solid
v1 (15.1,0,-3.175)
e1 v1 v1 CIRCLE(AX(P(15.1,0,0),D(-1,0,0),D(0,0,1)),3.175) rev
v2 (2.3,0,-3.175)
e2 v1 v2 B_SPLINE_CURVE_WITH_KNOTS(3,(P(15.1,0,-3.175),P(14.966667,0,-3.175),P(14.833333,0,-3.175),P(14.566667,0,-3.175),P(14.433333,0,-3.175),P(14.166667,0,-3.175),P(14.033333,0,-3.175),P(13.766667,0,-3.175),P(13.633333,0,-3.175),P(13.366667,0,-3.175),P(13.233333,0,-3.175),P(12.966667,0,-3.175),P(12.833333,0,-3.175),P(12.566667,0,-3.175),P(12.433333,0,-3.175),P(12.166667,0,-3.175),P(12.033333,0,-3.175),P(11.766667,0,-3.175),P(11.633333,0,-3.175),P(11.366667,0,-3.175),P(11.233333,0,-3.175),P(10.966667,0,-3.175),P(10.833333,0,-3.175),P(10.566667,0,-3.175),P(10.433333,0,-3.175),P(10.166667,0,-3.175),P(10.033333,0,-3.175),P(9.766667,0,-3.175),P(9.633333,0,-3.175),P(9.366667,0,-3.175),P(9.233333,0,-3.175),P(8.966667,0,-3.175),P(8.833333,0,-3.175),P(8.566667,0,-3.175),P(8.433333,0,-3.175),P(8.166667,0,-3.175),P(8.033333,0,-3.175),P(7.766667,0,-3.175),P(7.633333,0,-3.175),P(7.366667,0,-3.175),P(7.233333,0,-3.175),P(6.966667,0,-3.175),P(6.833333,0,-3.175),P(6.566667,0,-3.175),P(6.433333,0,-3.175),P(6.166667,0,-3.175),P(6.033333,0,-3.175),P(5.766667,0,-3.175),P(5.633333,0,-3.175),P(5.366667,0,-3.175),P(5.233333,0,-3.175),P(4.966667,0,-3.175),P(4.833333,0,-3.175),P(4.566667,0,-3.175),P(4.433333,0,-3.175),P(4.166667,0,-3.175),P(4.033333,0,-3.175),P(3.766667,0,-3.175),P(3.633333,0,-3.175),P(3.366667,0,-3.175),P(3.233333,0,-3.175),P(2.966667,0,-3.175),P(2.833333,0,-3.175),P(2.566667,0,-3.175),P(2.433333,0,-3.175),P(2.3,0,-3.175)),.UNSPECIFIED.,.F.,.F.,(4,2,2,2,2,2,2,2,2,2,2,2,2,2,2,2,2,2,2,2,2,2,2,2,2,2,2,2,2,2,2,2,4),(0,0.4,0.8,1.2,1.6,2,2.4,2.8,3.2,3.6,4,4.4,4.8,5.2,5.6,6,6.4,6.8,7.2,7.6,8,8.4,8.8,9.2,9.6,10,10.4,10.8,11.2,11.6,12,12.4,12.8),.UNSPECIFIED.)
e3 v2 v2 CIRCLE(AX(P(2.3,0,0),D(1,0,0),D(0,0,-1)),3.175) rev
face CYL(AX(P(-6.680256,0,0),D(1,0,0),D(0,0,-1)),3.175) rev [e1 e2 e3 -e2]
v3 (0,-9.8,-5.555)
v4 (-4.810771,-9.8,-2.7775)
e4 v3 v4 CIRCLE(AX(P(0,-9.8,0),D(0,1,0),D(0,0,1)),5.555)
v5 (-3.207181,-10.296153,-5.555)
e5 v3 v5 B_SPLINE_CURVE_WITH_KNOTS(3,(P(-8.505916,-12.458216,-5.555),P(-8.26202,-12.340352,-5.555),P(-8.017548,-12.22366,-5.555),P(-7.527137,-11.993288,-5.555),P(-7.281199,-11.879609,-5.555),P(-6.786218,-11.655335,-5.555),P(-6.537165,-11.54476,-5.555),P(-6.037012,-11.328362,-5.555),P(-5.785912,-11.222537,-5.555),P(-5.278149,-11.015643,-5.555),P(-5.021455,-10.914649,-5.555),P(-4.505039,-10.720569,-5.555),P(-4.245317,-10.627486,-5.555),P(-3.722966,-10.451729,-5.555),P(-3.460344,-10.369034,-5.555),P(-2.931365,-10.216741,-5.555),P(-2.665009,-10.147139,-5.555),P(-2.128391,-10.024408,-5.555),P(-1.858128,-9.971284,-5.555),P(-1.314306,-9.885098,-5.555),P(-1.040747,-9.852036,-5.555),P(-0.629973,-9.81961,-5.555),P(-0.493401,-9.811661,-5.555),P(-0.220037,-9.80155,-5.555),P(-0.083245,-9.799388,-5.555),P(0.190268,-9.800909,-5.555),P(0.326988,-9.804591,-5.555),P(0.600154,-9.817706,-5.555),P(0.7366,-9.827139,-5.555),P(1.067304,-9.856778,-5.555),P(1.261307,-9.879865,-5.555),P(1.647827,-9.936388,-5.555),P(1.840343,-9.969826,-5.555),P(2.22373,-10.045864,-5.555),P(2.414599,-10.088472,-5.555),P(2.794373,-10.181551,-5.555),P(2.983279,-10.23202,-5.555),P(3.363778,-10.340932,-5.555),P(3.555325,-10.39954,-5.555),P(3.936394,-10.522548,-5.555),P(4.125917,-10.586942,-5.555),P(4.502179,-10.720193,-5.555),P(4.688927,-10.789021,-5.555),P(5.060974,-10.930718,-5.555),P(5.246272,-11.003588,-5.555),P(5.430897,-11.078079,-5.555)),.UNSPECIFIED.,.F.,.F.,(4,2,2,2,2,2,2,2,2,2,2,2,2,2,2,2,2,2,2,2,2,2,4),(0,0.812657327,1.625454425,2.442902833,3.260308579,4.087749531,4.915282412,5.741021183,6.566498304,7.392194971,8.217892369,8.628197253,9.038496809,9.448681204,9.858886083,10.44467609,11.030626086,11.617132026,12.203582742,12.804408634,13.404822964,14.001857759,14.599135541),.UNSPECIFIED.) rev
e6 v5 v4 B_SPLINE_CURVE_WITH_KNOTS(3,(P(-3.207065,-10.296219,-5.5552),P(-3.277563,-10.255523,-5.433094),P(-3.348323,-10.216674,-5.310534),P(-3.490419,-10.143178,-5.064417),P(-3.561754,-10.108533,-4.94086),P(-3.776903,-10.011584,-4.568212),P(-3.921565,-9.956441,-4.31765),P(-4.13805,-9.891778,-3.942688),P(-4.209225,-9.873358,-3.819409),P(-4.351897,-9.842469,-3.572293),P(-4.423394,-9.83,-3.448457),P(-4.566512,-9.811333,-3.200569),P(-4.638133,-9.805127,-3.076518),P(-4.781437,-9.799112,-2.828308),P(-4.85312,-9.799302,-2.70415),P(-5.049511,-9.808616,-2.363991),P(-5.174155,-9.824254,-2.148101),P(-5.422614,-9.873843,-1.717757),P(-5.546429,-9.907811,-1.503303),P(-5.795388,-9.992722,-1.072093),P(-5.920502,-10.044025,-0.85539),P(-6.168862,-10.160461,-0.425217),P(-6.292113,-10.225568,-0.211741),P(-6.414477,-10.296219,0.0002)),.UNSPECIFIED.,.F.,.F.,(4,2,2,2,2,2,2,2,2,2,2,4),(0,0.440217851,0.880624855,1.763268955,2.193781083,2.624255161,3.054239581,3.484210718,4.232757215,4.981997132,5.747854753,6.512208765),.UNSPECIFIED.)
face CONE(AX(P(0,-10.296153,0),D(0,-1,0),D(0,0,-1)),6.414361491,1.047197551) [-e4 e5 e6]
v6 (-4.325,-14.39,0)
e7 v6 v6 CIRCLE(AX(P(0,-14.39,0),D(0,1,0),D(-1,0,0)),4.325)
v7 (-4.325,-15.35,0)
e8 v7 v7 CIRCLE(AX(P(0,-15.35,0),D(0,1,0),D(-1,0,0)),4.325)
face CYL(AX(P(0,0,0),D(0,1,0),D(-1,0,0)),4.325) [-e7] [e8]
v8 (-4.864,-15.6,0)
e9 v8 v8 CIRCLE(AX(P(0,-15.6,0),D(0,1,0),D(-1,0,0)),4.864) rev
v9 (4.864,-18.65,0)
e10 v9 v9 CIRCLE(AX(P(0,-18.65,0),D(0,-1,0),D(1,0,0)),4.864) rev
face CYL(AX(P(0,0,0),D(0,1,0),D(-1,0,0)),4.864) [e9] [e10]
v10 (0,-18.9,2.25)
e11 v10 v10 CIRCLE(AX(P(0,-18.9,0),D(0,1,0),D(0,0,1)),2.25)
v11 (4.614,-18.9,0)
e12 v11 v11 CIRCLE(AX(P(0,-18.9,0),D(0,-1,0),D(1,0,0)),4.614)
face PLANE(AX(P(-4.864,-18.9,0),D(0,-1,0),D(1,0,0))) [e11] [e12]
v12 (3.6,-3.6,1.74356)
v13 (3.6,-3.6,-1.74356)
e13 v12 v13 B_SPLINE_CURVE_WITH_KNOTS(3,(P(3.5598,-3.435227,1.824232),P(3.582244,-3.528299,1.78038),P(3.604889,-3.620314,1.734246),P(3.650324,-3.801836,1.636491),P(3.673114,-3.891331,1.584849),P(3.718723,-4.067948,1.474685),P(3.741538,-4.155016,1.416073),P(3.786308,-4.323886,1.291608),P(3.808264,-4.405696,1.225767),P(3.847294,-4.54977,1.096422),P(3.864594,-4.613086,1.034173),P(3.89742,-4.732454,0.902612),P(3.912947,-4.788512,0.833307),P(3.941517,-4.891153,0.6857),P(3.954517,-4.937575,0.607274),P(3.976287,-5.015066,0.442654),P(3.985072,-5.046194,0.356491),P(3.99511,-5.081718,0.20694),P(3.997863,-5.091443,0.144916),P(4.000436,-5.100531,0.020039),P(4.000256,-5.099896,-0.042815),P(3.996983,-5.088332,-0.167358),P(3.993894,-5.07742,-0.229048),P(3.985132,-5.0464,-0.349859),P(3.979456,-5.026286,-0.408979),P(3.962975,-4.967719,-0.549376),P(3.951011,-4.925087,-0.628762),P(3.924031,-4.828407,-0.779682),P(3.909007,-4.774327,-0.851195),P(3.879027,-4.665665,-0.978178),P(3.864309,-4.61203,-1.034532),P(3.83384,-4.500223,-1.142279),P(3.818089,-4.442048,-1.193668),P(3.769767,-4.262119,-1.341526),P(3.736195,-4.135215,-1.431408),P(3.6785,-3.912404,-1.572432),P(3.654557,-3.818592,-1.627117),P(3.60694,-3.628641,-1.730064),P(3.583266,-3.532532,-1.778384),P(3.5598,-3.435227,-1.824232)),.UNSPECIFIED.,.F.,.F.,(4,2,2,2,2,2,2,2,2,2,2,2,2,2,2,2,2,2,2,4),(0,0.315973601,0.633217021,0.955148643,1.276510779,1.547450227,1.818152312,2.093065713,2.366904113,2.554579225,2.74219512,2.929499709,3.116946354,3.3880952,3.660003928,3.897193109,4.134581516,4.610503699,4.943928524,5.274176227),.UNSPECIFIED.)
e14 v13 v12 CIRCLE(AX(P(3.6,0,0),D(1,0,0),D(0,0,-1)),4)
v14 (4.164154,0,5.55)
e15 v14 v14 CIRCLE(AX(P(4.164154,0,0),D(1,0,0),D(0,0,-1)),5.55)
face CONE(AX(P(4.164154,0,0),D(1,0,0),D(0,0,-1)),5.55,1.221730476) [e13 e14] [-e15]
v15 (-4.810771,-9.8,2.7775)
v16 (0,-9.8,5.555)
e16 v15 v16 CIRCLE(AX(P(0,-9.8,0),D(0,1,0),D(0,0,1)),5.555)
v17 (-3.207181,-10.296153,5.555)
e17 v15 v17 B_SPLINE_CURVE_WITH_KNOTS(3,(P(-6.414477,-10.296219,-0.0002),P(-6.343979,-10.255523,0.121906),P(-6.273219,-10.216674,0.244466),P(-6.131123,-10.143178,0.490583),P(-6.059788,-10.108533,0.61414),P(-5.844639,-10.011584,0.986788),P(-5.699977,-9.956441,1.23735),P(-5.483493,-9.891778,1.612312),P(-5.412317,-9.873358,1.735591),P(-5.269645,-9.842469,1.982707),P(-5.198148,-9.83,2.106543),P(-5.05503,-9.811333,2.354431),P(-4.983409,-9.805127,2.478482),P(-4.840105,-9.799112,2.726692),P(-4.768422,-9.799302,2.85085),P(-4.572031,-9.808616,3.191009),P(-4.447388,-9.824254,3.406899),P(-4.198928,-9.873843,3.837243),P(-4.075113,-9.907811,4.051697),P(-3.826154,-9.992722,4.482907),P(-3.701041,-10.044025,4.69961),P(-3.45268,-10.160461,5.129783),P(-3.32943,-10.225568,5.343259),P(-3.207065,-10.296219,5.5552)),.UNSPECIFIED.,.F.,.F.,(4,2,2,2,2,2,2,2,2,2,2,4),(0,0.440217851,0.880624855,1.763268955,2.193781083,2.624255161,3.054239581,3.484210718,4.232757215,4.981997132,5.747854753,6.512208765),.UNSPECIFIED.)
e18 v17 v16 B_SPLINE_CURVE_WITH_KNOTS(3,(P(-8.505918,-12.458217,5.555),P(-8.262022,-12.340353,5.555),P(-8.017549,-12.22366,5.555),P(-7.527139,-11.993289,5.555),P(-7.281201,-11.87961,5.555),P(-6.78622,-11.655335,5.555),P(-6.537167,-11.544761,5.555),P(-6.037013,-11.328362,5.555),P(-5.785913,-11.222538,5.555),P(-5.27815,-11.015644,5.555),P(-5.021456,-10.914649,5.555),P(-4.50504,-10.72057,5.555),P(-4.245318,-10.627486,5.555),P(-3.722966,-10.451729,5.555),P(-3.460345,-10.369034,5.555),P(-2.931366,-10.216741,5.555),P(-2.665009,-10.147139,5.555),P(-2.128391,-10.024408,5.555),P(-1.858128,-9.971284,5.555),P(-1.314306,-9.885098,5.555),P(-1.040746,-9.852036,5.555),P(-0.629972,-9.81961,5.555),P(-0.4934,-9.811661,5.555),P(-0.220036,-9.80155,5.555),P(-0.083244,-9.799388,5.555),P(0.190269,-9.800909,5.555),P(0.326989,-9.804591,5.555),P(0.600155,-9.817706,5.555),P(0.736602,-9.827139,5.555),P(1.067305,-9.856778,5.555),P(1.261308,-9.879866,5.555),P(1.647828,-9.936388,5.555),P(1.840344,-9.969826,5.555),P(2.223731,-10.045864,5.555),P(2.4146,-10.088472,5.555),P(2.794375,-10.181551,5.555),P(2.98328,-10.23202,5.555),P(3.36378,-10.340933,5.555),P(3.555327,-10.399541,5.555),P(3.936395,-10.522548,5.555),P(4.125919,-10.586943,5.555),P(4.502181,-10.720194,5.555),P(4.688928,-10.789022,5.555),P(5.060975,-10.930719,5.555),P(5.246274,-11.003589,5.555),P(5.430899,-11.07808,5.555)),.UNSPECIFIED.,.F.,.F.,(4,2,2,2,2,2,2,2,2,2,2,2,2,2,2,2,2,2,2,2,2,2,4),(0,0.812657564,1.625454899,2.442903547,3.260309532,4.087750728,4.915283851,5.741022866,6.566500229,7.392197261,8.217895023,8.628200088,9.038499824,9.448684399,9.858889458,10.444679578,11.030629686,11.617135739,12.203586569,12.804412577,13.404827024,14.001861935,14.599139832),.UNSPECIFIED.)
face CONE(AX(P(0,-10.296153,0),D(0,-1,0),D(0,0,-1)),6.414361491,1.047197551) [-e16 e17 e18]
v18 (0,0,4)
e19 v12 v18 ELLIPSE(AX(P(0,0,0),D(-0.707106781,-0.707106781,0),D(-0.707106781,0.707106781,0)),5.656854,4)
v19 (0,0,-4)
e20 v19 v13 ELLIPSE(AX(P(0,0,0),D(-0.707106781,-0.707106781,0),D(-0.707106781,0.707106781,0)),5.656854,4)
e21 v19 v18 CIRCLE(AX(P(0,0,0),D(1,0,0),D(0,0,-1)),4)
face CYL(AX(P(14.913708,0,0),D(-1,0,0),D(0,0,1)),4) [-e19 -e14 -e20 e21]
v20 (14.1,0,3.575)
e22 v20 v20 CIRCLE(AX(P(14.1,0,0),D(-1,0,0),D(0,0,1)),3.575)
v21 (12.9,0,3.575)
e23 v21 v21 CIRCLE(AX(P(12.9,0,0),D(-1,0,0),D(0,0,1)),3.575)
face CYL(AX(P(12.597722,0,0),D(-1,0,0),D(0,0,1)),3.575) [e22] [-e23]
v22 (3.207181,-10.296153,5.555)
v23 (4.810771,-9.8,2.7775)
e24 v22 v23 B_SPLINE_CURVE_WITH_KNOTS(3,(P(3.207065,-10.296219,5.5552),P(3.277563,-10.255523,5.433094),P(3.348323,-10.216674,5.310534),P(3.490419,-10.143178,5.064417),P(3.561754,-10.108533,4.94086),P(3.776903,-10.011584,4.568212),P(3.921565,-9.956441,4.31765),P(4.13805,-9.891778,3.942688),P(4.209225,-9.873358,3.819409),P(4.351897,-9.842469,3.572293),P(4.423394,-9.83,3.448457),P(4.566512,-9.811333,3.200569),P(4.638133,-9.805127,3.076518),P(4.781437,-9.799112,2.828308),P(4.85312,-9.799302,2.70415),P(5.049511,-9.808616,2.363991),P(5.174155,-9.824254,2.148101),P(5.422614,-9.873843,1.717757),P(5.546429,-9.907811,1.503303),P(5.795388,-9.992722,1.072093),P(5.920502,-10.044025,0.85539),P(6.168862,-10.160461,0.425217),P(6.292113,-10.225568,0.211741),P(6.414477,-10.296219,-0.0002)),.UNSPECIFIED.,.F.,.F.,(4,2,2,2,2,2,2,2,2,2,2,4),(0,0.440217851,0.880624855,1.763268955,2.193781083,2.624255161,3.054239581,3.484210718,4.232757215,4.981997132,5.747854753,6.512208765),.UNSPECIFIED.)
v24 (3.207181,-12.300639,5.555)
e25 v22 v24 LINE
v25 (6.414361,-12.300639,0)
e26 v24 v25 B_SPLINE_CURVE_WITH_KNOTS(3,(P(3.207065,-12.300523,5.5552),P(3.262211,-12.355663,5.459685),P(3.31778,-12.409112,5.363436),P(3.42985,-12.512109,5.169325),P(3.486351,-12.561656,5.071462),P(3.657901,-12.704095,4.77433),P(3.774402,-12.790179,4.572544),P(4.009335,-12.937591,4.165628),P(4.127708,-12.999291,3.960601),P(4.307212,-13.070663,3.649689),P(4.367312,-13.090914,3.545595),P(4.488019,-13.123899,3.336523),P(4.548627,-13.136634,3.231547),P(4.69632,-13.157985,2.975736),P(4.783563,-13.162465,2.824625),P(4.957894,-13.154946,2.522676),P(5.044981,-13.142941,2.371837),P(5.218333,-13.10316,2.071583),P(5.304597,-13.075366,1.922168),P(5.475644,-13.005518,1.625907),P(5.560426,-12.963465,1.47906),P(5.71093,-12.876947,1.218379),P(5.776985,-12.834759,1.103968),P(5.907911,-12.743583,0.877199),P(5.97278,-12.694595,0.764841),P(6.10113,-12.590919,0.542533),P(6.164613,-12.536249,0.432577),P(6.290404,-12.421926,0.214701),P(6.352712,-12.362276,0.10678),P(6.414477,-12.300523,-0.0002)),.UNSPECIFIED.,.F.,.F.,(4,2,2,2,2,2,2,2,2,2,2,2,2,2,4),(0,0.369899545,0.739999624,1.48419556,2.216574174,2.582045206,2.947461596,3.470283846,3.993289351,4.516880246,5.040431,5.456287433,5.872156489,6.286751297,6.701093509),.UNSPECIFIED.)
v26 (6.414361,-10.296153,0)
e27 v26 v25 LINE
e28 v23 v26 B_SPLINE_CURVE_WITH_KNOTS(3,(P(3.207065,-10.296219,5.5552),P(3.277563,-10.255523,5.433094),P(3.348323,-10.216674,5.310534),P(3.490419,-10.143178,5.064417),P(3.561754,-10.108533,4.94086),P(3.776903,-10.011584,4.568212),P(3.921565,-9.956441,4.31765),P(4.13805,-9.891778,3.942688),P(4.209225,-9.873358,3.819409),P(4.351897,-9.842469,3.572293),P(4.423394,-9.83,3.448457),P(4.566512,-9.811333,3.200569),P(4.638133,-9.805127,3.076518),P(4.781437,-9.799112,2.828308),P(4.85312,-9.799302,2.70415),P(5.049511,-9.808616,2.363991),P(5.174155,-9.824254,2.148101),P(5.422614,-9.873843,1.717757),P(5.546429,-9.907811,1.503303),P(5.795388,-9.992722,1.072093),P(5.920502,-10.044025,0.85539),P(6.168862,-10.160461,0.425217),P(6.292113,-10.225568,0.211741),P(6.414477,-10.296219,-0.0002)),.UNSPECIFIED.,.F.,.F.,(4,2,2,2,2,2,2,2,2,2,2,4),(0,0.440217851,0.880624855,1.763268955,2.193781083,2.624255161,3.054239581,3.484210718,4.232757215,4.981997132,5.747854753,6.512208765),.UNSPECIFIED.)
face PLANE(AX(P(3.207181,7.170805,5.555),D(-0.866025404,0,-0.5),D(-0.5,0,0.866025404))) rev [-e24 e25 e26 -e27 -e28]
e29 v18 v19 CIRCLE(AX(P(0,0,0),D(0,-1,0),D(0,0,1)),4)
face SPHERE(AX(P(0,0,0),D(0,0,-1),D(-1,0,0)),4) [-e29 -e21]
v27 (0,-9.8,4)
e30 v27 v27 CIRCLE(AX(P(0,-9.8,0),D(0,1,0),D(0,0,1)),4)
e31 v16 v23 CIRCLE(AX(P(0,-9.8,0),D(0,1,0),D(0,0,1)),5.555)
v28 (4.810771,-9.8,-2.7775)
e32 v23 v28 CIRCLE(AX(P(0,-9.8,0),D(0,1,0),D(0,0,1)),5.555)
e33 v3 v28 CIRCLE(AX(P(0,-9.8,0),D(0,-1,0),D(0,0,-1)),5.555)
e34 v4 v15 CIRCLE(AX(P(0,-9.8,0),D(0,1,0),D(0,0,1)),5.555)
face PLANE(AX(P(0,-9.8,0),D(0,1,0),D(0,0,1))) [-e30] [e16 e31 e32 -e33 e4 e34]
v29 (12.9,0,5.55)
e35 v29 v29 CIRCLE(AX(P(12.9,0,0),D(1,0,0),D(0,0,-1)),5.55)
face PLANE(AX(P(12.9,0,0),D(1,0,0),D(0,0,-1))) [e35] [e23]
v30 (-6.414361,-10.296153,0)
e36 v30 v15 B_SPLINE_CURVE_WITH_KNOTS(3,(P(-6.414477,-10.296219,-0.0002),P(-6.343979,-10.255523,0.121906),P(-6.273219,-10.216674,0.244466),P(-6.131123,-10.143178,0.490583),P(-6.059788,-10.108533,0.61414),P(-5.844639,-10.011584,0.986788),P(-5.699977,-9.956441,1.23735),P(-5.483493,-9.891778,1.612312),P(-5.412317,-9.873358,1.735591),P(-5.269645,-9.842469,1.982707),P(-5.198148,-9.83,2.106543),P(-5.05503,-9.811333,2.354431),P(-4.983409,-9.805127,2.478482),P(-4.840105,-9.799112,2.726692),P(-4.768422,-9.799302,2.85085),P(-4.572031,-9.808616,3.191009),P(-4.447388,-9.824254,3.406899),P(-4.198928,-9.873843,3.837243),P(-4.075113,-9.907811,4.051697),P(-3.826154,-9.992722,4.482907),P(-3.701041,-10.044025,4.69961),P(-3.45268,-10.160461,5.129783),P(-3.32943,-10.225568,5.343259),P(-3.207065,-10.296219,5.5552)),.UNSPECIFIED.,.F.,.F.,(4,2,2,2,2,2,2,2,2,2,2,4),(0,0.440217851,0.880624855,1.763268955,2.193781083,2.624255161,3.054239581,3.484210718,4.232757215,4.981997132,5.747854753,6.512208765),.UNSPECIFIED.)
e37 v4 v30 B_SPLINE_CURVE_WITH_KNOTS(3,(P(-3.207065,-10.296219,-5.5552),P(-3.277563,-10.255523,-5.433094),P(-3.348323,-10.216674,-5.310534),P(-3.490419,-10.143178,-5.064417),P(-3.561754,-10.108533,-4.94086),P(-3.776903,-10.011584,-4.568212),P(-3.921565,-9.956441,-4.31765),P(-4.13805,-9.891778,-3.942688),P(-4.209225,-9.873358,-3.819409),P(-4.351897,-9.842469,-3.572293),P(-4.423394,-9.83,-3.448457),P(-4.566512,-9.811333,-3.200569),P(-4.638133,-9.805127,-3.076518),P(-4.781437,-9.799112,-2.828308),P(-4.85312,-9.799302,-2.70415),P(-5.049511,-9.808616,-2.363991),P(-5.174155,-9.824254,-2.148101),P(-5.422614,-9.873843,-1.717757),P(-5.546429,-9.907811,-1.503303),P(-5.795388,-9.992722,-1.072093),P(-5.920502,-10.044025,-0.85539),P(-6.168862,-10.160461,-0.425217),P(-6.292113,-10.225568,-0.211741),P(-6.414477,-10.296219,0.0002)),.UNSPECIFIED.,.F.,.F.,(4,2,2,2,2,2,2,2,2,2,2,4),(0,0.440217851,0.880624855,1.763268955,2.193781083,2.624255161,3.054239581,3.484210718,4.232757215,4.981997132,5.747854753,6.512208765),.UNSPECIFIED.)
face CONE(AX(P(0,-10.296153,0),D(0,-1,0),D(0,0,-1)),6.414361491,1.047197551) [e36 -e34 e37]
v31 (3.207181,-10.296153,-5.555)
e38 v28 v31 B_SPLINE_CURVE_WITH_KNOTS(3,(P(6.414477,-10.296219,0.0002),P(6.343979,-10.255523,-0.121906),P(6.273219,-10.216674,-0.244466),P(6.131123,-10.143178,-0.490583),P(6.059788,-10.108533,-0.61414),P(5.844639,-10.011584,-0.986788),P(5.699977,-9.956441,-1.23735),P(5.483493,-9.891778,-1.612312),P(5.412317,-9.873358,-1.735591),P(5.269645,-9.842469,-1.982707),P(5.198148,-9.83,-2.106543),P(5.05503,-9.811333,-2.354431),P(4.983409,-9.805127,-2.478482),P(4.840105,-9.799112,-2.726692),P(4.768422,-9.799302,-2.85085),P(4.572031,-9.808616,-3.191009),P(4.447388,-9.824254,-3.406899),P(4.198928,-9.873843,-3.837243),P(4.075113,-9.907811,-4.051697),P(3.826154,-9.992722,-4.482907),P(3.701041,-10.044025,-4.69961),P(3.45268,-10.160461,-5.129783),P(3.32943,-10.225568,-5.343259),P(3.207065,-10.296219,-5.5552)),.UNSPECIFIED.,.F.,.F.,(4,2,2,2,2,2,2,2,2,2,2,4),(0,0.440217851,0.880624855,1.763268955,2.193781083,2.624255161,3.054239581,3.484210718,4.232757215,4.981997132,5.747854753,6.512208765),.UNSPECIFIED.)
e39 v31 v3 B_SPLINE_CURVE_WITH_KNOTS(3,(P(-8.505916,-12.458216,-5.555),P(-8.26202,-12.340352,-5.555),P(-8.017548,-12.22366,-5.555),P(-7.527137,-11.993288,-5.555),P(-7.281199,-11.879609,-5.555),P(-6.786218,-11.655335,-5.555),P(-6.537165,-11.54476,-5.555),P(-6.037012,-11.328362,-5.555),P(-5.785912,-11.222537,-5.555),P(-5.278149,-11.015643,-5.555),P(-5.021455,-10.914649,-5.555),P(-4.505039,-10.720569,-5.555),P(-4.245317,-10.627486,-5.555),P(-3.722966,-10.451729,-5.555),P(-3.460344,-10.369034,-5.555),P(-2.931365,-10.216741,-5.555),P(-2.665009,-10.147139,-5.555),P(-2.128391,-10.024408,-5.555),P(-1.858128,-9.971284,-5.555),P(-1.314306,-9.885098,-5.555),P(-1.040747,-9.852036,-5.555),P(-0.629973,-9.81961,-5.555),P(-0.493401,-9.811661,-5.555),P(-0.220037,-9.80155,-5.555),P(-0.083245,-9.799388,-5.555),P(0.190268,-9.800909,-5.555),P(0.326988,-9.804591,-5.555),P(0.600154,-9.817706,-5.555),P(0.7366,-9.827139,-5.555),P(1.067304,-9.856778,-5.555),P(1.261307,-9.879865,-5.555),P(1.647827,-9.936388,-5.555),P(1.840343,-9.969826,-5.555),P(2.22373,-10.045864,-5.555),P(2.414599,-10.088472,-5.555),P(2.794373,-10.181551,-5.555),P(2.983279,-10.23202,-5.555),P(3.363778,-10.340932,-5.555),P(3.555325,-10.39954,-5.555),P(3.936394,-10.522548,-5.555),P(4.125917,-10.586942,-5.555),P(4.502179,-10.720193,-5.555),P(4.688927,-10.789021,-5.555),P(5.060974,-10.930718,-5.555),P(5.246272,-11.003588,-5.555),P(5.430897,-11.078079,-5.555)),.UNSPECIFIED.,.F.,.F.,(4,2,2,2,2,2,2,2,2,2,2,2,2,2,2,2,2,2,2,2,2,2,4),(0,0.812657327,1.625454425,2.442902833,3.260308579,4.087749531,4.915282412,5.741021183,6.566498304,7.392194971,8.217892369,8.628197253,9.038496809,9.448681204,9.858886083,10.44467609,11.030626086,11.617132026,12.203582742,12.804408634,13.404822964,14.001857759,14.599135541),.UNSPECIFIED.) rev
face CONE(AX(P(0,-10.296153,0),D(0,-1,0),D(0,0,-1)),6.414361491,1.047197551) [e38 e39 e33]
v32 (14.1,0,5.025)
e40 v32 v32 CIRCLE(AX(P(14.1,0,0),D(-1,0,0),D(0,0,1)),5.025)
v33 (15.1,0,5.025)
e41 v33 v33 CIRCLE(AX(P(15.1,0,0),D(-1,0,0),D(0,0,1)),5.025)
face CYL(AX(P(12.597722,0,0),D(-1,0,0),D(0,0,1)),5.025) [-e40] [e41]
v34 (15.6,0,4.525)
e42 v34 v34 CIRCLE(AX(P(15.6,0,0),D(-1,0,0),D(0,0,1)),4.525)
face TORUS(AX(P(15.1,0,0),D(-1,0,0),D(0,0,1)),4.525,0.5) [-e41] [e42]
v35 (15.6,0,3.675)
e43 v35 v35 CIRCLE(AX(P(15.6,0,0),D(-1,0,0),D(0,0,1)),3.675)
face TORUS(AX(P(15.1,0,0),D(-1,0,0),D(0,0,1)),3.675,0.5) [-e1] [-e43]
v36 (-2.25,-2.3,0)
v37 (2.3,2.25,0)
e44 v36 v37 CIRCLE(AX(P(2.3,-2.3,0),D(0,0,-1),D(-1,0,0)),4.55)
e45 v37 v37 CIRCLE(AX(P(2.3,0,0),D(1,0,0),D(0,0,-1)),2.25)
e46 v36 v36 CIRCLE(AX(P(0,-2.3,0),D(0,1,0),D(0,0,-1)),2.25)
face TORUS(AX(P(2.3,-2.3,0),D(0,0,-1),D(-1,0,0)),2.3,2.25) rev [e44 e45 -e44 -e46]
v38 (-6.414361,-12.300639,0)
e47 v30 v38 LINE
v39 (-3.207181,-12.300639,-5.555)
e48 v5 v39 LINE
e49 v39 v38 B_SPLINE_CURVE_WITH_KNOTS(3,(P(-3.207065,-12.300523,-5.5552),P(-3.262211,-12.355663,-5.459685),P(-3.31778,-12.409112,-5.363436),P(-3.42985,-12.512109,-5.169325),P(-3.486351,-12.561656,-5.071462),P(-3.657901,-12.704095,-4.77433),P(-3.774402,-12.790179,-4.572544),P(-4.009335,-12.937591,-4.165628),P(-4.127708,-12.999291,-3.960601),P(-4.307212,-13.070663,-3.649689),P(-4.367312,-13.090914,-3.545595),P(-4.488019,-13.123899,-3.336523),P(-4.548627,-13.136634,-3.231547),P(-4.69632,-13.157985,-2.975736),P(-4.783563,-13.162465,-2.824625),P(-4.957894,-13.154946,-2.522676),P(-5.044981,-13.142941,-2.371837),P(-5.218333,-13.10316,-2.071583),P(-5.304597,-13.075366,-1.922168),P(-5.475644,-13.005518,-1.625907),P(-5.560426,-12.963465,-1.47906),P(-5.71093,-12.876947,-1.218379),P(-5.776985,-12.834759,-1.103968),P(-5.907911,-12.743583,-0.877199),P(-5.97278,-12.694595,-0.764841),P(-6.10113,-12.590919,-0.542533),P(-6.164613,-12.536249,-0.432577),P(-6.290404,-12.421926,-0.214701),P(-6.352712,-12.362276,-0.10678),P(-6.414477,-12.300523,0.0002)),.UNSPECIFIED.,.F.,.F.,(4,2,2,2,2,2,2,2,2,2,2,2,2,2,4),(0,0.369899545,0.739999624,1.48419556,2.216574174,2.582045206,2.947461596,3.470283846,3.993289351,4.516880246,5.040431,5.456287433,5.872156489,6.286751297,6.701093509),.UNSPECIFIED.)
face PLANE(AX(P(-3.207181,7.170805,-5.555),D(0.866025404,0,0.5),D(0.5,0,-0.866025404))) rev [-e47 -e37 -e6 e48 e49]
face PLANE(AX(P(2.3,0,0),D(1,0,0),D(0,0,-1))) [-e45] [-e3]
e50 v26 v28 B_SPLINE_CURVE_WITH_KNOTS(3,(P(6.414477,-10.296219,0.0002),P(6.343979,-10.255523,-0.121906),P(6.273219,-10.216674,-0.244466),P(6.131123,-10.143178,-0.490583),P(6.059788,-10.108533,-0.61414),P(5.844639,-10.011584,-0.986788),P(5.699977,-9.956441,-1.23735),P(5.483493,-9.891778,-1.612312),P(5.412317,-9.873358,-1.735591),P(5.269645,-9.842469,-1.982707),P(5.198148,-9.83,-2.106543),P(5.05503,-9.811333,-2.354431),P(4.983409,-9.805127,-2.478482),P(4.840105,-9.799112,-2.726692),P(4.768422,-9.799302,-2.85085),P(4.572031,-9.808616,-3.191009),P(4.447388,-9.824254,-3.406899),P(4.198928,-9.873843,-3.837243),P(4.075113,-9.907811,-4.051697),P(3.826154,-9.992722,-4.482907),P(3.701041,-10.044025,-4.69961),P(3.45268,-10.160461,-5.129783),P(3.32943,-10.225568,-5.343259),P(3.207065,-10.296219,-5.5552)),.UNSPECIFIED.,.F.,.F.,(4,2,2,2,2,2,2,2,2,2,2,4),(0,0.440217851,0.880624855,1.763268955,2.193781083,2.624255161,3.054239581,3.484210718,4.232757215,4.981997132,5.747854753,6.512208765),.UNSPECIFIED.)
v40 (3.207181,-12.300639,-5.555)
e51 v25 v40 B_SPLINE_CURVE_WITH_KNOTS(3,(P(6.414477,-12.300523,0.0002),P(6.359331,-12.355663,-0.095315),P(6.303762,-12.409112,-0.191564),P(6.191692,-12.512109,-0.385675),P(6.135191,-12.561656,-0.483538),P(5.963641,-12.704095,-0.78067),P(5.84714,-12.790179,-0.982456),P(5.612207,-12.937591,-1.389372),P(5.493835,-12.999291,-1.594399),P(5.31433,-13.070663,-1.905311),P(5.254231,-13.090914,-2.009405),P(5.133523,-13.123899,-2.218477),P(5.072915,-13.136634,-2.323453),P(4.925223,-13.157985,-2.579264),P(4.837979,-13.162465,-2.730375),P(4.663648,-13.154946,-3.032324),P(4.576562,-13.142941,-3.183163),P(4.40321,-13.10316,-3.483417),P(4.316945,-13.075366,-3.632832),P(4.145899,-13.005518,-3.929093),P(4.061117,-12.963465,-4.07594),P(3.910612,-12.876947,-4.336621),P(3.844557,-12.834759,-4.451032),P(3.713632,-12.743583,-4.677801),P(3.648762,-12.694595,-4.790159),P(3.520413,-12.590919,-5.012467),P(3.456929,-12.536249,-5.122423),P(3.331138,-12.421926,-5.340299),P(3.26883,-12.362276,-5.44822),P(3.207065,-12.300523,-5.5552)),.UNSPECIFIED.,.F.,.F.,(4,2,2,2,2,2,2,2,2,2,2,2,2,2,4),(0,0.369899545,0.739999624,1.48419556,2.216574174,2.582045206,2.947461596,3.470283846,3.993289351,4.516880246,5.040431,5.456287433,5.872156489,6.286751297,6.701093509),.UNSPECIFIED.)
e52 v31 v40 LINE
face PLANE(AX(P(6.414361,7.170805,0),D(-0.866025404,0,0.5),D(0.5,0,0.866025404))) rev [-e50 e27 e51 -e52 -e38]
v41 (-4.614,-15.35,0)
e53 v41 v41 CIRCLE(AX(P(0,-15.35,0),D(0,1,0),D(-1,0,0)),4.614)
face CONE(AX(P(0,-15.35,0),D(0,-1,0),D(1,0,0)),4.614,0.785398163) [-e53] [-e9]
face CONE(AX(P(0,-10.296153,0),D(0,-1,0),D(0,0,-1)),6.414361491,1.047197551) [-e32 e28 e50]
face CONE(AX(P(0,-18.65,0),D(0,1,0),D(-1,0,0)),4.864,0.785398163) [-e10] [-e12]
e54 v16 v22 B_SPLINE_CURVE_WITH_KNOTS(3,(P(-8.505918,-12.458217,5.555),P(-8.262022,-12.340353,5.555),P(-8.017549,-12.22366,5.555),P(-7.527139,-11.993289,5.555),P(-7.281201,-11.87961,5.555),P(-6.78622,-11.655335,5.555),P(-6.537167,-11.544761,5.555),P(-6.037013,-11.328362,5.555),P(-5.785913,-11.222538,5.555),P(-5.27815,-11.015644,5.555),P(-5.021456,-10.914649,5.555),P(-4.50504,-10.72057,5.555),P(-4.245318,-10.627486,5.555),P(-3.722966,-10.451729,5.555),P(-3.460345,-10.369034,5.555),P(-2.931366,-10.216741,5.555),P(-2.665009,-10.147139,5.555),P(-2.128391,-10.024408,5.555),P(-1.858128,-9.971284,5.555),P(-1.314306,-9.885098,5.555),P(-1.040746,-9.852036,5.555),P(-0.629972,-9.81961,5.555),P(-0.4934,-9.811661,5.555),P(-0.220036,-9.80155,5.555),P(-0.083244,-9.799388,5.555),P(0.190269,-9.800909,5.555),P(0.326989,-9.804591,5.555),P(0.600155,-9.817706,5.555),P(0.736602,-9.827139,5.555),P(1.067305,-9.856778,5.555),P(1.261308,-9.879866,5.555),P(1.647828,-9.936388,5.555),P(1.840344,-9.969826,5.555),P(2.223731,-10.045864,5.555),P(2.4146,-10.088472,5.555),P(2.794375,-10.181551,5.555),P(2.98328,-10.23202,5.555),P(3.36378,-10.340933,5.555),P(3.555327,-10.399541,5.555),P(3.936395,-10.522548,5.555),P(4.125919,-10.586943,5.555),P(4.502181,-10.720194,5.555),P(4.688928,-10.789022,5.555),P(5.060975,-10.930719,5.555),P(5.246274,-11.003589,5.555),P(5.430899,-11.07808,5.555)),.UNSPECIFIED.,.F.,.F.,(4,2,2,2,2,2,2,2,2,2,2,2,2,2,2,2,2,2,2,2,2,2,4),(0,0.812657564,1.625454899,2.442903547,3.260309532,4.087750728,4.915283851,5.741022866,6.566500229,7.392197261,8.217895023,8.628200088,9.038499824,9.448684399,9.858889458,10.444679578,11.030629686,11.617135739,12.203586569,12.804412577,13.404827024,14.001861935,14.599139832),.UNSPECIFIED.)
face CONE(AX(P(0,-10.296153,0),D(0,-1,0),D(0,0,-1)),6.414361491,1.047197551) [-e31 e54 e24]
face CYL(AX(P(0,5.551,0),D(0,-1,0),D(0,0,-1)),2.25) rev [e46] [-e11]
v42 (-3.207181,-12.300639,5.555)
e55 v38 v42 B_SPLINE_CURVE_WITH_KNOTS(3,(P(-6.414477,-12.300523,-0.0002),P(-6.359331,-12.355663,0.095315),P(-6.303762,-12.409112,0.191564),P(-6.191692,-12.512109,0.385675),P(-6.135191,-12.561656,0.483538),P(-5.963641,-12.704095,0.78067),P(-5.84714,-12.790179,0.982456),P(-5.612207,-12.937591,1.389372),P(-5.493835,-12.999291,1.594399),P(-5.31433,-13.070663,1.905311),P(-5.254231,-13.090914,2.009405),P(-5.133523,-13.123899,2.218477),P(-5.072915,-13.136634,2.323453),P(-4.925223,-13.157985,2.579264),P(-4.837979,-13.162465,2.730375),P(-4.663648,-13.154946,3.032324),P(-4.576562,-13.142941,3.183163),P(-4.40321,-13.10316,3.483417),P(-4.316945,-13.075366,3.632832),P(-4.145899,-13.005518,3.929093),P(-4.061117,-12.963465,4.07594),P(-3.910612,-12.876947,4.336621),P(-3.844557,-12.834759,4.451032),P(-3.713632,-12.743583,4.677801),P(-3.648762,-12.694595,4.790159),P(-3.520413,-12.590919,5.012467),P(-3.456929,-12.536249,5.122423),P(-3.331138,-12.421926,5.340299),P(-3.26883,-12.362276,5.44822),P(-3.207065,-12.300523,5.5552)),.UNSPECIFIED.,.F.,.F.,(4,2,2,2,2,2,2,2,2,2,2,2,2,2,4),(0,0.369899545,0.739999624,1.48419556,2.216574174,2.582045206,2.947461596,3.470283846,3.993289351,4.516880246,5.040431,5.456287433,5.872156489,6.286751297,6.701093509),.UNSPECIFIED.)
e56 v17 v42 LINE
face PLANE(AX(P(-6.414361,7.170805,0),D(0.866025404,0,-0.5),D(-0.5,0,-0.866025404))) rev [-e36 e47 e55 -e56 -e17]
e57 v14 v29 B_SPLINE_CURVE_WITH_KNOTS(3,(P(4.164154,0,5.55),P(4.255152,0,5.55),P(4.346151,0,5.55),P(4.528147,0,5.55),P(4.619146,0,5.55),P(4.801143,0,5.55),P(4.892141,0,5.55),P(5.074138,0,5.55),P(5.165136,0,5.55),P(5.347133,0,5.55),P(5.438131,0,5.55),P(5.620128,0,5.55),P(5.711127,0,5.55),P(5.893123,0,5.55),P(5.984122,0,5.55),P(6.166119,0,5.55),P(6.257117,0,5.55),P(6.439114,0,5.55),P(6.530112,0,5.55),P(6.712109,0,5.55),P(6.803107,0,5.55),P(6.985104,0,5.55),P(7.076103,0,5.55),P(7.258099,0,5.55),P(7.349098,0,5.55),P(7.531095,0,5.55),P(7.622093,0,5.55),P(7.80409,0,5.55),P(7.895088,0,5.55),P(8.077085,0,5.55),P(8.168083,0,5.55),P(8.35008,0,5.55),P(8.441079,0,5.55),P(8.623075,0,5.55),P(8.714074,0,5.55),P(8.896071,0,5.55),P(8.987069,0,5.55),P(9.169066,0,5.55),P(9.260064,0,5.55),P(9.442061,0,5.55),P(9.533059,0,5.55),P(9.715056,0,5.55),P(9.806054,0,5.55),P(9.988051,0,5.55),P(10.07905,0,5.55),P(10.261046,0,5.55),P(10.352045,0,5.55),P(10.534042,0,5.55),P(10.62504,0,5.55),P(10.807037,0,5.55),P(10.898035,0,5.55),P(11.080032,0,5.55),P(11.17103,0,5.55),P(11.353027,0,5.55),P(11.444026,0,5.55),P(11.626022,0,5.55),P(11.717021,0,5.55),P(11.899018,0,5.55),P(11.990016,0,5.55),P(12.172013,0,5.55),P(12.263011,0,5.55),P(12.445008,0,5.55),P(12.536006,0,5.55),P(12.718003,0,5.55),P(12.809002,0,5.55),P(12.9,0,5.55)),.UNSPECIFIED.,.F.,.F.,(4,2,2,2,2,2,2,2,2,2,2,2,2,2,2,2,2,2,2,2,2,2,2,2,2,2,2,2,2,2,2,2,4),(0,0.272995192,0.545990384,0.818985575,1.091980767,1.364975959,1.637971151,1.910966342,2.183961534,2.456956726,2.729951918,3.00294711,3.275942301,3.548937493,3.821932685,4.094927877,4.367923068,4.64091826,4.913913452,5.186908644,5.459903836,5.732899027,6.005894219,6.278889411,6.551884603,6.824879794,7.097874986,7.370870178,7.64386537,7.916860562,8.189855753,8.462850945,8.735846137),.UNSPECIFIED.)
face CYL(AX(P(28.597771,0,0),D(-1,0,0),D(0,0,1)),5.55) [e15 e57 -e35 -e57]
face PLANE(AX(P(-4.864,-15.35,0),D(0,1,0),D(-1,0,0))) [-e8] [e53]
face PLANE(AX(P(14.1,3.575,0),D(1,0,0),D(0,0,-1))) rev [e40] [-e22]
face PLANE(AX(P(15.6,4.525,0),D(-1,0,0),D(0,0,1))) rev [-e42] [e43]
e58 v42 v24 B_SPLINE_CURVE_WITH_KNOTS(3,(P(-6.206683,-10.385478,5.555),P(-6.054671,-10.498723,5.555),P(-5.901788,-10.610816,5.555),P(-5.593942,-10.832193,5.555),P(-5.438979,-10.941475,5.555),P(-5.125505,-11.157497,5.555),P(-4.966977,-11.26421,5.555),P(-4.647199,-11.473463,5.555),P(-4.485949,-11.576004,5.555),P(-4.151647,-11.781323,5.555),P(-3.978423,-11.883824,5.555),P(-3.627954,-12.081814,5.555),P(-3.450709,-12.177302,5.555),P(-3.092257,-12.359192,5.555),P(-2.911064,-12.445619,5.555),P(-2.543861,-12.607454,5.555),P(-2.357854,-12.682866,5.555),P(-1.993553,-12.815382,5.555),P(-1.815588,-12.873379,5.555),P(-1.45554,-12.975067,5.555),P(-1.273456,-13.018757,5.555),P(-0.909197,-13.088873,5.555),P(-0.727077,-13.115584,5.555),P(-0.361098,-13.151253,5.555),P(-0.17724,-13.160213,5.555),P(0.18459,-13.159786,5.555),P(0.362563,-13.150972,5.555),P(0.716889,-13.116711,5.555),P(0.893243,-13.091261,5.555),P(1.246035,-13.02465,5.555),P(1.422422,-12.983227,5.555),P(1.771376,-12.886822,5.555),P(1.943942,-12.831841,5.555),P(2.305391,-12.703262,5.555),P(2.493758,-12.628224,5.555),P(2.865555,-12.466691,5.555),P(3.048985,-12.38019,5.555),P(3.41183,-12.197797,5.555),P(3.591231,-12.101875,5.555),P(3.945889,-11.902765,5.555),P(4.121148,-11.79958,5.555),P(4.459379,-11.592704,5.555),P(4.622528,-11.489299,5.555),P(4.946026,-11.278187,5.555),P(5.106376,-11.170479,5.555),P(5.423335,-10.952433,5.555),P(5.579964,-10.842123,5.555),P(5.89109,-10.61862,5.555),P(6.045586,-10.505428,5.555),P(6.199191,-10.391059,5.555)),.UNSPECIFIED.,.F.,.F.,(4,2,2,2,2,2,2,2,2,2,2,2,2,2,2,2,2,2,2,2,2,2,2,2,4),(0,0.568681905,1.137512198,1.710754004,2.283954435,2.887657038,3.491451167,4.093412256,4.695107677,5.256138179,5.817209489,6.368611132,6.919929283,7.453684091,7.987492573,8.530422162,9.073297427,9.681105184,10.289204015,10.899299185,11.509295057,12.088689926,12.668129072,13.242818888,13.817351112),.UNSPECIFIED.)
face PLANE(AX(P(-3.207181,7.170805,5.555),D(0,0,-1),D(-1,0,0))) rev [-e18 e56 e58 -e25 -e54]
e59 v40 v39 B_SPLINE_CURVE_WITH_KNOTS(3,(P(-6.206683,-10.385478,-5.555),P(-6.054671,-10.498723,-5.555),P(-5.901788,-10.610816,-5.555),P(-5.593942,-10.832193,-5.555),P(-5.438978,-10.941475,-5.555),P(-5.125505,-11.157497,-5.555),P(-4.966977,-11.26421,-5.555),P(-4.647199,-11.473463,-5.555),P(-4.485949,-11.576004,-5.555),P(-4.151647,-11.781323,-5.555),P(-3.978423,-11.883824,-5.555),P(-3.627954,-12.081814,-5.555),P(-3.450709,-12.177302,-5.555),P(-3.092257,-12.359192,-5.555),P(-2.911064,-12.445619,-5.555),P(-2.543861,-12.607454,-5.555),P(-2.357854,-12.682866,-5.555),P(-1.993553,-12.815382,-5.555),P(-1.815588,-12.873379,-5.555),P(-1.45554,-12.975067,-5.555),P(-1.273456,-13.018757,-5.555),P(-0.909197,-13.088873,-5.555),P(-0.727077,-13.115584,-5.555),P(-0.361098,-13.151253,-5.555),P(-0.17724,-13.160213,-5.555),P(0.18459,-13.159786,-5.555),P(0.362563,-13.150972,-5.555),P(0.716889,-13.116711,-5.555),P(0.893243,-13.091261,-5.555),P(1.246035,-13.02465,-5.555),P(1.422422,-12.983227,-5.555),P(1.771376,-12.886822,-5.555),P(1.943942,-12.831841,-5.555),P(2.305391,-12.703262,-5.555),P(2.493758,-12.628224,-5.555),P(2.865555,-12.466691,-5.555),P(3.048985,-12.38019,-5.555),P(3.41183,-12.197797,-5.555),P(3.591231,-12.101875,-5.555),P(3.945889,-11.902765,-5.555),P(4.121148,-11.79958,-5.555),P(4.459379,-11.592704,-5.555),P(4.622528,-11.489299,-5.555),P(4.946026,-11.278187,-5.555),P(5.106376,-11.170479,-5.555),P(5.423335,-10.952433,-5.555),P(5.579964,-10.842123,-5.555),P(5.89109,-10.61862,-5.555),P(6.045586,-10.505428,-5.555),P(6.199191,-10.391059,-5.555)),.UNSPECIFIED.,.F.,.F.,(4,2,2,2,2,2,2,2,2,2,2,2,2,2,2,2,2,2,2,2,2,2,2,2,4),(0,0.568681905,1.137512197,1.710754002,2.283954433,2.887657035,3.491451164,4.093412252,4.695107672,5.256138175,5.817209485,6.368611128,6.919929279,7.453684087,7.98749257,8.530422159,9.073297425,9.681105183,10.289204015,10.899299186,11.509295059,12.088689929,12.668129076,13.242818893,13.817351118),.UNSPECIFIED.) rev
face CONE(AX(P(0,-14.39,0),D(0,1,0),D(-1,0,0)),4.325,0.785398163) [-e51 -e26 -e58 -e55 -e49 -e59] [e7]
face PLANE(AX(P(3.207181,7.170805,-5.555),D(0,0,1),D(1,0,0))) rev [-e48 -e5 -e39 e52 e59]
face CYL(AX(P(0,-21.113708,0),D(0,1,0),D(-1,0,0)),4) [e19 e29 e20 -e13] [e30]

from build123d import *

# Parameters (mm, degrees)
SKETCH1_R             = 4
BASE_EXTRUDE_DEPTH    = 3.6
RBODY_SKETCH_R        = 5.55
RBODY_DEPTH           = 9.3
ELBOW_ANGLE           = 90
SKETCH3_R             = 4
BOSS_EXTRUDE1_DEPTH   = 9.8
NUT_DEPTH             = 4.59
THREAD_CHAMFER_SIZE   = 0.25
RTUBE_START           = -13.3
RTUBE_SKETCH_R        = 3.175
RTUBE_DEPTH           = 13.3
RTUBE_RADIUS_R        = 0.5
DIAMETER_R            = 2.25
PORT_THREADS_REACH    = 31.53
PORT_THREADS_SKETCH_R = 2.25


with BuildPart() as part:
    # Sketch1 → Base-Extrude (new body)
    with BuildSketch(Plane(origin=(0, 0, 0), x_dir=(0, 0, -1), z_dir=(1, 0, 0))):
        with Locations(Location((0, 0, 0), (0, 0, 180))):
            Circle(SKETCH1_R)
    extrude(amount=BASE_EXTRUDE_DEPTH)

    # RBody_Sketch → RBody (add)
    with BuildSketch(Plane(origin=(3.6, 0, 0), x_dir=(0, 0, -1), z_dir=(1, 0, 0))):
        with Locations(Location((0, 0, 0), (0, 0, 180))):
            Circle(RBODY_SKETCH_R)
    extrude(amount=RBODY_DEPTH)

    # RBody_Chamfer: read off the stored shape, not the designer's step
    # RBody_Chamfer outline → RBody_Chamfer (revolve, cut)
    with BuildSketch(Plane.YX):
        Polygon((5.55, 4.164153863), (4, 3.6), (5.55, 3.6), align=None)
    revolve(axis=Axis((0, 0, 0), (1, 0, 0)), mode=Mode.SUBTRACT)

    # RRelease_Sketch → RRelease (revolve)
    with BuildSketch(Plane.XY, mode=Mode.PRIVATE) as rrelease_sk:
        with BuildLine():
            Line((12.9, 3.575), (14.1, 3.575))
            Line((14.1, 3.575), (14.1, 5.025))
            Line((14.1, 5.025), (15.1, 5.025))
            ThreePointArc((15.1, 5.025), (15.453553391, 4.878553391), (15.6, 4.525))
            Line((15.6, 4.525), (15.6, 0))
            Line((15.6, 0), (12.9, 0))
            Line((12.9, 0), (12.9, 3.575))
        make_face()
    revolve(rrelease_sk.sketch.rotate(Axis((12.597722381, 0, 0), (1, 0, 0)), 90), axis=Axis((12.597722381, 0, 0), (1, 0, 0)))

    # Elbow_Sketch → Elbow (revolve)
    with BuildSketch(Plane.ZY):
        with BuildLine():
            Line((-4, 0), (4, 0))
            ThreePointArc((4, 0), (0, 4), (-4, 0))
        make_face()
    revolve(axis=Axis((0, 0, -6.487672297), (0, 0, 1)), revolution_arc=ELBOW_ANGLE)

    # Sketch3 → Boss-Extrude1 (add)
    with BuildSketch(Plane.XZ):
        with Locations(Location((0, 0, 0), (0, 0, 90))):
            Circle(SKETCH3_R)
    extrude(amount=BOSS_EXTRUDE1_DEPTH)

    # Nut_Sketch → Nut (add)
    with BuildSketch(Plane(origin=(0, -14.39, 0), x_dir=(-1, 0, 0), z_dir=(0, 1, 0))):
        Polygon((6.414361491, 0), (3.207180745, 5.555), (-3.207180745, 5.555), (-6.414361491, 0), (-3.207180745, -5.555), (3.207180745, -5.555), align=None)
    extrude(amount=NUT_DEPTH)

    # Nut_Chamfer_Sketch → Nut_Chamfer (revolve, cut)
    with BuildSketch(Plane.XY):
        Polygon((-5.555, -9.8), (-6.414361491, -9.8), (-6.414361491, -10.296152588), align=None)
        Polygon((-6.414361491, -13.893847412), (-5.555, -14.39), (-6.414361491, -14.39), align=None)
    revolve(axis=Axis((0, -1.551633987, 0), (0, 1, 0)), mode=Mode.SUBTRACT)

    # Thread_Sketch → Thread (revolve)
    with BuildSketch(Plane.XY):
        Polygon((0, -14.39), (-4.325, -14.39), (-4.325, -15.35), (-4.864, -15.35), (-4.864, -18.9), (0, -18.9), align=None)
    revolve(axis=Axis((0, 0, 0), (0, -1, 0)))

    # Thread_Chamfer
    thread_chamfer_edges = [part.edges().sort_by_distance(p)[0] for p in [
        (4.864, -18.9, 0),
        (4.864, -15.35, 0),
    ]]
    chamfer(thread_chamfer_edges, length=THREAD_CHAMFER_SIZE)

    # Sketch6 → Cut-Revolve1 (revolve, cut)
    with BuildSketch(Plane.XY):
        Polygon((-4.325, -14.39), (-6.414361491, -14.39), (-6.414361491, -12.300638509), align=None)
    revolve(axis=Axis((0, -7.772283854, 0), (0, -1, 0)), mode=Mode.SUBTRACT)

    # RTube_Sketch → RTube (cut)
    with BuildSketch(Plane(origin=(15.6, 0, 0), x_dir=(0, 0, -1), z_dir=(1, 0, 0)).offset(RTUBE_START)):
        Circle(RTUBE_SKETCH_R)
    extrude(amount=RTUBE_DEPTH, mode=Mode.SUBTRACT)

    # RTube_Radius
    rtube_radius_edges = [part.edges().sort_by_distance(p)[0] for p in [
        (15.6, 0, 3.175),
    ]]
    fillet(rtube_radius_edges, radius=RTUBE_RADIUS_R)

    # Port_Curve: sweep along a path in Profile
    with BuildLine(Plane.XY) as port_curve_path:
        ThreePointArc((2.3, 0), (0.673654403, -0.673654403), (0, -2.3))
    # Diameter → Port_Curve (sweep, cut)
    with BuildSketch(Plane(origin=(2.3, 0, 0), x_dir=(0, 0, -1), z_dir=(1, 0, 0))):
        Circle(DIAMETER_R)
    sweep(path=port_curve_path.line, mode=Mode.SUBTRACT)

    # Port_Threads_Sketch → Port_Threads (cut, up to next)
    with BuildSketch(Plane(origin=(0, -18.9, 0), x_dir=(-1, 0, 0), z_dir=(0, 1, 0)), mode=Mode.PRIVATE) as port_threads_sk1:
        Circle(PORT_THREADS_SKETCH_R)
    port_threads_tool1 = extrude(port_threads_sk1.sketch, amount=PORT_THREADS_REACH, mode=Mode.PRIVATE) & part.part
    add(port_threads_tool1.solids().sort_by_distance((0, -18.9, 0))[0], mode=Mode.SUBTRACT)


solid = part.part
